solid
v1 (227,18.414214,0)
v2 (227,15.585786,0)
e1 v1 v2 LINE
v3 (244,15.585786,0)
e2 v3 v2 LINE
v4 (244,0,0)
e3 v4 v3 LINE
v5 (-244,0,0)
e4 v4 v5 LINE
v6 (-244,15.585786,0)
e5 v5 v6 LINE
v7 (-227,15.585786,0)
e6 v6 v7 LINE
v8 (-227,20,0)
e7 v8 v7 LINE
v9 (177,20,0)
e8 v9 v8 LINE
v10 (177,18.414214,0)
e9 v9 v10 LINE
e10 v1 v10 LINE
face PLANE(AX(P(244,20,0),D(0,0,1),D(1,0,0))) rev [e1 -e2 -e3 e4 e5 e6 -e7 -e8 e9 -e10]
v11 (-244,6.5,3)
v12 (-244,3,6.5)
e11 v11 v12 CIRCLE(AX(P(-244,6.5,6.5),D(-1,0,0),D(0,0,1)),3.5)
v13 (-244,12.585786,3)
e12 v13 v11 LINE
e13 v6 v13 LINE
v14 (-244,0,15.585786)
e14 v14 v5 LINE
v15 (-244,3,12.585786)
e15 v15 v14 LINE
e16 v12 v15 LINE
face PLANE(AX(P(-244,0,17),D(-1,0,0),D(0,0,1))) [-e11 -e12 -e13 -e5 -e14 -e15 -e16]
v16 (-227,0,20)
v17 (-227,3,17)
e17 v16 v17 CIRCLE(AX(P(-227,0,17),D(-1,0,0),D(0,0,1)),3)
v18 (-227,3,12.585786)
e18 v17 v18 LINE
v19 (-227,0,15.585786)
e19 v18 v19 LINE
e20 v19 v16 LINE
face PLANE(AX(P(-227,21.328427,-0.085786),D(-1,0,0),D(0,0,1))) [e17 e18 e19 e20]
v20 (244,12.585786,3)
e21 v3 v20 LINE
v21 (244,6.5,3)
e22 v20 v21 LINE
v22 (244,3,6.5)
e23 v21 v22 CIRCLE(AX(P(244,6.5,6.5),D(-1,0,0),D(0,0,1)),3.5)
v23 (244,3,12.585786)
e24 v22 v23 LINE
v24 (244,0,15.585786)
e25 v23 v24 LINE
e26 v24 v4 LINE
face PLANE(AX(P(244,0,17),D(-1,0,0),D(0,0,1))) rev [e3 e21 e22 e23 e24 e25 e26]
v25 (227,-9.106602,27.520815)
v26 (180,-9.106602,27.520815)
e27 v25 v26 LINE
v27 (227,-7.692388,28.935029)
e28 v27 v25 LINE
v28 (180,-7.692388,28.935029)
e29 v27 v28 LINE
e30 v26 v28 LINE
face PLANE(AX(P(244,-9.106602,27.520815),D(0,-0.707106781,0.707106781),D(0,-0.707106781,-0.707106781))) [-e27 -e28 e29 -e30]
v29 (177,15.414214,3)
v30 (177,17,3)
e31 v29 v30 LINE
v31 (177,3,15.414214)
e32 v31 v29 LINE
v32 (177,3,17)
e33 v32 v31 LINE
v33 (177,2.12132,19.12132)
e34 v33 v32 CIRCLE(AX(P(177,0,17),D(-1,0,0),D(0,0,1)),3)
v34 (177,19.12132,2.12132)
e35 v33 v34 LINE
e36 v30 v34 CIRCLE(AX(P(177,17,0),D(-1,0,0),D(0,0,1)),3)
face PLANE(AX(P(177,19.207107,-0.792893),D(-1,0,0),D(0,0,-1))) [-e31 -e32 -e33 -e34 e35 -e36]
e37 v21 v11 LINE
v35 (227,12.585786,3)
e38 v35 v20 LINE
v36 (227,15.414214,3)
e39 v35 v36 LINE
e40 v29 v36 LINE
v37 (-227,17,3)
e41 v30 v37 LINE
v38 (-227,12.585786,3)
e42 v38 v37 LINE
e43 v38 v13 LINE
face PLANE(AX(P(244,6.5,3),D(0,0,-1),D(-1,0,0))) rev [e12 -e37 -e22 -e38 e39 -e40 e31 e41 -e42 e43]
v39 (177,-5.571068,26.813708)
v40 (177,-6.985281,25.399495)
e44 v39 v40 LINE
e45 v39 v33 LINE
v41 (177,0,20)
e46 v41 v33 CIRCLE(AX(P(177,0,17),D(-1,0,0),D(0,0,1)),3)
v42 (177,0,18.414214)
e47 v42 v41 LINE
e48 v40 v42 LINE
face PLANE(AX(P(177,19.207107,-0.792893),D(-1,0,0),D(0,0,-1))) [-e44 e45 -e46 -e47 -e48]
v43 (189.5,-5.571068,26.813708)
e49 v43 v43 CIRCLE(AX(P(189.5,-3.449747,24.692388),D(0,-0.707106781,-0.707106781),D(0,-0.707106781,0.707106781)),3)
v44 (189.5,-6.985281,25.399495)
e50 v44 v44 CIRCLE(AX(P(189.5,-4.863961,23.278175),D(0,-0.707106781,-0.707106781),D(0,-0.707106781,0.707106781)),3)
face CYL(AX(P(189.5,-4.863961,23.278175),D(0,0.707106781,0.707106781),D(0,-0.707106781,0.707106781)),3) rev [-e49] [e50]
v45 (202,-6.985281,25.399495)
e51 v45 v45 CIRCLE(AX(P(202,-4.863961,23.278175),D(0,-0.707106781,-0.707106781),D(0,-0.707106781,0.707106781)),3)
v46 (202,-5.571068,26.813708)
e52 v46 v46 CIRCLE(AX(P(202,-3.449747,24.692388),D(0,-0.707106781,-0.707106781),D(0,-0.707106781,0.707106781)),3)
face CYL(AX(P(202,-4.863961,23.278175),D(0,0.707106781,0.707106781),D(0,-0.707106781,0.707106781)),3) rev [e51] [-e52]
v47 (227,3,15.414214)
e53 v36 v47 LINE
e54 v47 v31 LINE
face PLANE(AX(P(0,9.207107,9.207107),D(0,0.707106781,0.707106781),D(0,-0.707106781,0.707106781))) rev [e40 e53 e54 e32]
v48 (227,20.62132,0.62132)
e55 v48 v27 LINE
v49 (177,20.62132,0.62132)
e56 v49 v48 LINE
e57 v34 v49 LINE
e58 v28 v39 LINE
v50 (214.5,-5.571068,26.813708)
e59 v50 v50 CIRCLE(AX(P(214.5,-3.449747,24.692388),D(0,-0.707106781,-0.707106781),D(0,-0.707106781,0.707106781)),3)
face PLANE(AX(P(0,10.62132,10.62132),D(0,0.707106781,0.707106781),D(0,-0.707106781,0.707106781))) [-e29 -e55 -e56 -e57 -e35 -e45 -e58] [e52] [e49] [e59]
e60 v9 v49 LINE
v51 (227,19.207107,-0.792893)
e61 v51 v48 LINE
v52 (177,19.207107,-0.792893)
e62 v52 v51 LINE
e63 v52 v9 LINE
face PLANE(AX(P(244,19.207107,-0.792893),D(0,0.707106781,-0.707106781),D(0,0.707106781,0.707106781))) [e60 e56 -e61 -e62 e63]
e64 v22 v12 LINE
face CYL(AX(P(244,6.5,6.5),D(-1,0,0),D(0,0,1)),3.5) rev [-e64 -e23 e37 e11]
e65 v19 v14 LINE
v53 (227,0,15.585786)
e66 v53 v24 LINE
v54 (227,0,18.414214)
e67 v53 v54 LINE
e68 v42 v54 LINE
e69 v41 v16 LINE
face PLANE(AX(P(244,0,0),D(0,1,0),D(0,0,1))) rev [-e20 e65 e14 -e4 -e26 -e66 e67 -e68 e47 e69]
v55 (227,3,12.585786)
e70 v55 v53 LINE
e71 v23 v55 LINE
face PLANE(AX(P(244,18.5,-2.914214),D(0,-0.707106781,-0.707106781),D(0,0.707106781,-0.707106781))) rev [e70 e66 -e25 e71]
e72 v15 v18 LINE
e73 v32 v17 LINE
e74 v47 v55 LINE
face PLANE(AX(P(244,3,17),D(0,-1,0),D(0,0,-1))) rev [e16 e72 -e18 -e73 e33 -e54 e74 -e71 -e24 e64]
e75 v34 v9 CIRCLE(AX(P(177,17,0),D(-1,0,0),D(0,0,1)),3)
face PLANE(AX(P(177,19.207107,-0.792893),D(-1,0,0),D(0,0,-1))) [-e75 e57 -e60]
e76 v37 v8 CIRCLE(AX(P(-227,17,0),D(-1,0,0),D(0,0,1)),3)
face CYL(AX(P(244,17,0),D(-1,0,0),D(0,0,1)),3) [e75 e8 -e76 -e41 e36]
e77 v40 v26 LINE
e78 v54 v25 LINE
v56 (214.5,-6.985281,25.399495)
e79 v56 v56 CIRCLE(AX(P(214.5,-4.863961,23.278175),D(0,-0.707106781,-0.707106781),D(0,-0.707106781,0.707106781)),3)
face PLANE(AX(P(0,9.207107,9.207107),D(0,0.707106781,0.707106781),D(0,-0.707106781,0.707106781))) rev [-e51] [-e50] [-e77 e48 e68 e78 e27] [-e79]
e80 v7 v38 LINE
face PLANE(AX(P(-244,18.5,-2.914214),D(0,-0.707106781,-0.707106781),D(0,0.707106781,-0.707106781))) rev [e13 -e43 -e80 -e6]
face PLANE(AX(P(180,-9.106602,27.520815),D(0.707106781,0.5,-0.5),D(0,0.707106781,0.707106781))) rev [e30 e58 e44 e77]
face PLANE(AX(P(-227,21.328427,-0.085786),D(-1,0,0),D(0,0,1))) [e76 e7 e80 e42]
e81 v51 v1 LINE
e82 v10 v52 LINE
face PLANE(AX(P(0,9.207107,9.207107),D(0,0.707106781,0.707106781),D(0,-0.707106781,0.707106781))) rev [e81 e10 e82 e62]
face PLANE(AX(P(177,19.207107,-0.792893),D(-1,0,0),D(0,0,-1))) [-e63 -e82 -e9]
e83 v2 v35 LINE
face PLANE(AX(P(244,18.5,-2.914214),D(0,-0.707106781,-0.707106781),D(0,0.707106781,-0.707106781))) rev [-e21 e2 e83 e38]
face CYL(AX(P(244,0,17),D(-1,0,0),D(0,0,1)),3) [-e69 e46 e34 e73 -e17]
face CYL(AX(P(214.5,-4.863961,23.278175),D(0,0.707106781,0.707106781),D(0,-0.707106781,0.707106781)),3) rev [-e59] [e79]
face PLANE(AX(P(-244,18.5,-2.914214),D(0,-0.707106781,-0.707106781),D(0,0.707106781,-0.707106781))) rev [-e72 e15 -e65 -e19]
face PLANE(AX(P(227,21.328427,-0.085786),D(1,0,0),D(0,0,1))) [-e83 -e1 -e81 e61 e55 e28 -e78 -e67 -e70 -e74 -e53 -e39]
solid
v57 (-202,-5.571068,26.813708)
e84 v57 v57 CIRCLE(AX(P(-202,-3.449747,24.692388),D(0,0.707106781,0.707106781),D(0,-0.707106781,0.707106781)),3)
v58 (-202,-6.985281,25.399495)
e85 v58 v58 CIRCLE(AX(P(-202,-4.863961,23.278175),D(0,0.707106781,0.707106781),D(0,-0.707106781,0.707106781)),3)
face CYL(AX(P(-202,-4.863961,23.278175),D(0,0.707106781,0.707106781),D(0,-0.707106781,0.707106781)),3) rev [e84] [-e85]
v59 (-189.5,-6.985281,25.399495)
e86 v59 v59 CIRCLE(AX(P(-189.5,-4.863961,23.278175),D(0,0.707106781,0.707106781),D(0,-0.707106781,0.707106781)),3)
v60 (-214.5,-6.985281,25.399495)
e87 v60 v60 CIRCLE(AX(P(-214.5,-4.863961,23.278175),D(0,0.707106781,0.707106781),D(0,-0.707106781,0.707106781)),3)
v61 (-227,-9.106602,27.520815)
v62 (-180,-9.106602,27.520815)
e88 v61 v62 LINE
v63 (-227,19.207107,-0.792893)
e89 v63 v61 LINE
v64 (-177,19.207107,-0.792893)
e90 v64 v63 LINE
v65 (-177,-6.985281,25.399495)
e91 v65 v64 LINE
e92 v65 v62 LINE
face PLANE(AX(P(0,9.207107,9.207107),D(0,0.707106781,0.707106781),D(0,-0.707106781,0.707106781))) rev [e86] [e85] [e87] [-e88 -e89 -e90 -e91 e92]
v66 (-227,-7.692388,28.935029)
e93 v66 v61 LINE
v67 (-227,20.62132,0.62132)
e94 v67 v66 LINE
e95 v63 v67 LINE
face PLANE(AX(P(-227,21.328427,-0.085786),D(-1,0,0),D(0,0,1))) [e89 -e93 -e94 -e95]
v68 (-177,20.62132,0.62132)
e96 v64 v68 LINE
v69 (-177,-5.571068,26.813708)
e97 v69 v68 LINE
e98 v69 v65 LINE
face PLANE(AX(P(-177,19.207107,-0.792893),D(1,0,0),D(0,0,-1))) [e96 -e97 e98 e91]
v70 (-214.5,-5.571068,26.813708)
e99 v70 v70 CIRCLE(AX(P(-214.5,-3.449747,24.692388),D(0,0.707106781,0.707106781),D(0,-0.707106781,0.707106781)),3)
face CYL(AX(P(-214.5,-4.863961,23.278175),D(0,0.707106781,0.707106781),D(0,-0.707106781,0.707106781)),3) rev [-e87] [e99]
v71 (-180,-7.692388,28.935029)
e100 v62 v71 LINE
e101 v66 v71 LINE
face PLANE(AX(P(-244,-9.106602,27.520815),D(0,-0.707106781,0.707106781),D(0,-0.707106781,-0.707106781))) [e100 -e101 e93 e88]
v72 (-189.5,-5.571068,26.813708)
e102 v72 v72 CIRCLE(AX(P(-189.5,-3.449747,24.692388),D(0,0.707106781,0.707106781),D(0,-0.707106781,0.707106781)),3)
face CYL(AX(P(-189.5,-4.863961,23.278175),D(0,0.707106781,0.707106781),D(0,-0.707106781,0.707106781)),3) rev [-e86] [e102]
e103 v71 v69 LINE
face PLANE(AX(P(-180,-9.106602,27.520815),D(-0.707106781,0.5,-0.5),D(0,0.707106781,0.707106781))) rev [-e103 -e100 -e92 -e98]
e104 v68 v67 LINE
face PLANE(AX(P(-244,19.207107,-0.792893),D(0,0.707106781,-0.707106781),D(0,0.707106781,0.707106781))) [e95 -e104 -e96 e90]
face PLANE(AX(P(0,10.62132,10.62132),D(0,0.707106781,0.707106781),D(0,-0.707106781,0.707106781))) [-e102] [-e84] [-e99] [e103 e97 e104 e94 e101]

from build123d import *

# Parameters (mm, degrees)
HIERRO_ANGULAR_20_X_20_X_3_1_DEPTH = 488
CROQUIS3_W                         = 67
CROQUIS3_H                         = 40.041630561
CROQUIS3_R                         = 3
SALIENTE_EXTRUIR1_DEPTH            = 2
CHAFL_N1_SIZE                      = 3
CROQUIS4_W                         = 17
CROQUIS4_H                         = 4
CORTAR_EXTRUIR1_DEPTH              = 248.824532079
SIMETR_A3_START                    = -16.899494837
SIMETR_A3_OUTLINE_W                = 50
SIMETR_A3_OUTLINE_H                = 2
SIMETR_A3_DEPTH                    = 31.041630461
SIMETR_A3_START_2                  = 217.5000001
SIMETR_A3_2_DEPTH                  = 9.4999999
SIMETR_A3_START_3                  = 180
SIMETR_A3_3_DEPTH                  = 6.4999999
SIMETR_A3_START_4                  = 192.5000001
SIMETR_A3_4_DEPTH                  = 6.4999998
SIMETR_A3_START_5                  = 205.0000001
SIMETR_A3_5_DEPTH                  = 6.4999998
SIMETR_A3_START_6                  = 11.02081528
SIMETR_A3_6_DEPTH                  = 4
SIMETR_A3_START_7                  = 13.02081528
SIMETR_A3_7_DEPTH                  = 2


with BuildPart() as part:
    # Sketch1 → Hierro angular 20 X 20 X 3(1) (new body)
    with BuildSketch(Plane.YZ.offset(-244)):
        with BuildLine():
            Line((0, 0), (0, 20))
            ThreePointArc((0, 20), (2.121320344, 19.121320344), (3, 17))
            Line((3, 17), (3, 6.5))
            ThreePointArc((3, 6.5), (4.025126266, 4.025126266), (6.5, 3))
            Line((6.5, 3), (17, 3))
            ThreePointArc((17, 3), (19.121320344, 2.121320344), (20, 0))
            Line((20, 0), (0, 0))
        make_face()
    extrude(amount=HIERRO_ANGULAR_20_X_20_X_3_1_DEPTH)


with BuildPart() as body_2:
    # Croquis3 → Saliente-Extruir1 (new body)
    with BuildSketch(Plane(origin=(0, 10.621320344, 10.621320344), x_dir=(1, 0, 0), z_dir=(0, 0.7071067811865477, 0.7071067811865475))):
        with Locations((-210.5, -5.878679656)):
            Rectangle(CROQUIS3_W, CROQUIS3_H)
        with Locations(Location((-189.5, -19.899494937, 0), (0, 0, 270))):
            Circle(CROQUIS3_R, mode=Mode.SUBTRACT)
        with Locations(Location((-202, -19.899494937, 0), (0, 0, 270))):
            Circle(CROQUIS3_R, mode=Mode.SUBTRACT)
        with Locations(Location((-214.5, -19.899494937, 0), (0, 0, 270))):
            Circle(CROQUIS3_R, mode=Mode.SUBTRACT)
    extrude(amount=-SALIENTE_EXTRUIR1_DEPTH)

    # Chaflán1
    chafl_n1_edges = [body_2.edges().sort_by_distance(p)[0] for p in [
        (-177, -8.399494937, 28.227922061),
        (-244, -8.399494937, 28.227922061),
    ]]
    chamfer(chafl_n1_edges, length=CHAFL_N1_SIZE)


with BuildPart() as cortar_extruir1_tool:
    # Croquis4 → Cortar-Extruir1 (new, through all)
    with BuildSketch(Plane(origin=(0, -18.313708499, 18.313708499), x_dir=(1, 0, 0), z_dir=(0, -0.7071067811865476, 0.7071067811865476))):
        with Locations((-235.5, 13.02081528)):
            Rectangle(CROQUIS4_W, CROQUIS4_H)
    extrude(amount=-CORTAR_EXTRUIR1_DEPTH)


with BuildPart() as part_1:
    add(part.part)

    # Cortar-Extruir1: cut by cortar_extruir1_tool
    add(cortar_extruir1_tool.part, mode=Mode.SUBTRACT)

    # Simetría3: read off the stored shape, not the designer's step
    # Simetría3 outline → Simetría3 (add)
    with BuildSketch(Plane(origin=(0, 0, 0), x_dir=(1, 0, 0), z_dir=(0, 0.707106781186547, -0.707106781186548)).offset(SIMETR_A3_START)):
        with Locations((202, -14.02081528)):
            Rectangle(SIMETR_A3_OUTLINE_W, SIMETR_A3_OUTLINE_H)
    extrude(amount=SIMETR_A3_DEPTH)

    # Simetr_a3 2 outline → Simetr_a3 2 (add)
    with BuildSketch(Plane.YZ.offset(SIMETR_A3_START_2)):
        Polygon((-2.742640617, 21.156854179), (-1.328427054, 22.571067741), (-7.692388155, 28.935028843), (-9.106601718, 27.52081528), align=None)
    extrude(amount=SIMETR_A3_2_DEPTH)

    # Simetr_a3 3 outline → Simetr_a3 3 (add)
    with BuildSketch(Plane.YZ.offset(SIMETR_A3_START_3)):
        Polygon((-2.742640617, 21.156854179), (-1.328427054, 22.571067741), (-7.692388155, 28.935028843), (-9.106601718, 27.52081528), align=None)
    extrude(amount=SIMETR_A3_3_DEPTH)

    # Simetr_a3 4 outline → Simetr_a3 4 (add)
    with BuildSketch(Plane.YZ.offset(SIMETR_A3_START_4)):
        Polygon((-2.742640617, 21.156854179), (-1.328427054, 22.571067741), (-7.692388155, 28.935028843), (-9.106601718, 27.52081528), align=None)
    extrude(amount=SIMETR_A3_4_DEPTH)

    # Simetr_a3 5 outline → Simetr_a3 5 (add)
    with BuildSketch(Plane.YZ.offset(SIMETR_A3_START_5)):
        Polygon((-2.742640617, 21.156854179), (-1.328427054, 22.571067741), (-7.692388155, 28.935028843), (-9.106601718, 27.52081528), align=None)
    extrude(amount=SIMETR_A3_5_DEPTH)

    # Simetr_a3 6 outline → Simetr_a3 6 (cut)
    with BuildSketch(Plane(origin=(0, 0, 0), x_dir=(1, 0, 0), z_dir=(0, 0.707106781186548, 0.707106781186547)).offset(SIMETR_A3_START_6)):
        Polygon((244, 16), (227, 16), (227, -25.899494937), (217.5000001, -25.899494937), (217.5000001, -27), (244, -27), align=None)
    extrude(amount=SIMETR_A3_6_DEPTH, mode=Mode.SUBTRACT)

    # Simetr_a3 7 outline → Simetr_a3 7 (add)
    with BuildSketch(Plane(origin=(0, 0, 0), x_dir=(1, 0, 0), z_dir=(0, 0.707106781186548, 0.707106781186547)).offset(SIMETR_A3_START_7)):
        Polygon((180, -16.899494837), (177, -16.899494837), (177, -22.899494937), (180, -25.899494937), align=None)
        with BuildLine():
            Line((186.5, -19.899494937), (186.4999999, -25.899494937))
            Line((186.4999999, -25.899494937), (192.5000001, -25.899494937))
            Line((192.5000001, -25.899494937), (192.5, -19.899494937))
            ThreePointArc((192.5, -19.899494937), (189.5, -22.899494937), (186.5, -19.899494937))
        make_face()
        with BuildLine():
            Line((186.4999999, -16.899494836), (186.5, -19.899494937))
            ThreePointArc((186.5, -19.899494937), (187.378679656, -17.778174593), (189.5, -16.899494937))
            Line((189.5, -16.899494937), (186.4999999, -16.899494836))
        make_face()
        with BuildLine():
            Line((211.4999999, -25.899494937), (217.5000001, -25.899494937))
            Line((217.5000001, -25.899494937), (217.5, -19.899494937))
            ThreePointArc((217.5, -19.899494937), (214.5, -22.899494937), (211.5, -19.899494937))
            Line((211.5, -19.899494937), (211.4999999, -25.899494937))
        make_face()
        with BuildLine():
            Line((199, -19.899494937), (198.9999999, -25.899494937))
            Line((198.9999999, -25.899494937), (205.0000001, -25.899494937))
            Line((205.0000001, -25.899494937), (205, -19.899494937))
            ThreePointArc((205, -19.899494937), (202, -22.899494937), (199, -19.899494937))
        make_face()
        with BuildLine():
            ThreePointArc((189.5, -16.899494937), (191.621320344, -17.778174593), (192.5, -19.899494937))
            Line((192.5, -19.899494937), (192.5000001, -16.899494836))
            Line((192.5000001, -16.899494836), (189.5, -16.899494937))
        make_face()
        with BuildLine():
            ThreePointArc((214.5, -16.899494937), (216.621320344, -17.778174593), (217.5, -19.899494937))
            Line((217.5, -19.899494937), (217.5000001, -16.899494836))
            Line((217.5000001, -16.899494836), (214.5, -16.899494937))
        make_face()
        with BuildLine():
            Line((198.9999999, -16.899494836), (199, -19.899494937))
            ThreePointArc((199, -19.899494937), (199.878679656, -17.778174593), (202, -16.899494937))
            Line((202, -16.899494937), (198.9999999, -16.899494836))
        make_face()
        with BuildLine():
            Line((211.4999999, -16.899494836), (211.5, -19.899494937))
            ThreePointArc((211.5, -19.899494937), (212.378679656, -17.778174593), (214.5, -16.899494937))
            Line((214.5, -16.899494937), (211.4999999, -16.899494836))
        make_face()
        with BuildLine():
            ThreePointArc((202, -16.899494937), (204.121320344, -17.778174593), (205, -19.899494937))
            Line((205, -19.899494937), (205.0000001, -16.899494836))
            Line((205.0000001, -16.899494836), (202, -16.899494937))
        make_face()
    extrude(amount=SIMETR_A3_7_DEPTH)


with BuildPart() as body_2_1:
    add(body_2.part)

    # Cortar-Extruir1: cut by cortar_extruir1_tool
    add(cortar_extruir1_tool.part, mode=Mode.SUBTRACT)


solid = Compound([part_1.part, body_2_1.part])
